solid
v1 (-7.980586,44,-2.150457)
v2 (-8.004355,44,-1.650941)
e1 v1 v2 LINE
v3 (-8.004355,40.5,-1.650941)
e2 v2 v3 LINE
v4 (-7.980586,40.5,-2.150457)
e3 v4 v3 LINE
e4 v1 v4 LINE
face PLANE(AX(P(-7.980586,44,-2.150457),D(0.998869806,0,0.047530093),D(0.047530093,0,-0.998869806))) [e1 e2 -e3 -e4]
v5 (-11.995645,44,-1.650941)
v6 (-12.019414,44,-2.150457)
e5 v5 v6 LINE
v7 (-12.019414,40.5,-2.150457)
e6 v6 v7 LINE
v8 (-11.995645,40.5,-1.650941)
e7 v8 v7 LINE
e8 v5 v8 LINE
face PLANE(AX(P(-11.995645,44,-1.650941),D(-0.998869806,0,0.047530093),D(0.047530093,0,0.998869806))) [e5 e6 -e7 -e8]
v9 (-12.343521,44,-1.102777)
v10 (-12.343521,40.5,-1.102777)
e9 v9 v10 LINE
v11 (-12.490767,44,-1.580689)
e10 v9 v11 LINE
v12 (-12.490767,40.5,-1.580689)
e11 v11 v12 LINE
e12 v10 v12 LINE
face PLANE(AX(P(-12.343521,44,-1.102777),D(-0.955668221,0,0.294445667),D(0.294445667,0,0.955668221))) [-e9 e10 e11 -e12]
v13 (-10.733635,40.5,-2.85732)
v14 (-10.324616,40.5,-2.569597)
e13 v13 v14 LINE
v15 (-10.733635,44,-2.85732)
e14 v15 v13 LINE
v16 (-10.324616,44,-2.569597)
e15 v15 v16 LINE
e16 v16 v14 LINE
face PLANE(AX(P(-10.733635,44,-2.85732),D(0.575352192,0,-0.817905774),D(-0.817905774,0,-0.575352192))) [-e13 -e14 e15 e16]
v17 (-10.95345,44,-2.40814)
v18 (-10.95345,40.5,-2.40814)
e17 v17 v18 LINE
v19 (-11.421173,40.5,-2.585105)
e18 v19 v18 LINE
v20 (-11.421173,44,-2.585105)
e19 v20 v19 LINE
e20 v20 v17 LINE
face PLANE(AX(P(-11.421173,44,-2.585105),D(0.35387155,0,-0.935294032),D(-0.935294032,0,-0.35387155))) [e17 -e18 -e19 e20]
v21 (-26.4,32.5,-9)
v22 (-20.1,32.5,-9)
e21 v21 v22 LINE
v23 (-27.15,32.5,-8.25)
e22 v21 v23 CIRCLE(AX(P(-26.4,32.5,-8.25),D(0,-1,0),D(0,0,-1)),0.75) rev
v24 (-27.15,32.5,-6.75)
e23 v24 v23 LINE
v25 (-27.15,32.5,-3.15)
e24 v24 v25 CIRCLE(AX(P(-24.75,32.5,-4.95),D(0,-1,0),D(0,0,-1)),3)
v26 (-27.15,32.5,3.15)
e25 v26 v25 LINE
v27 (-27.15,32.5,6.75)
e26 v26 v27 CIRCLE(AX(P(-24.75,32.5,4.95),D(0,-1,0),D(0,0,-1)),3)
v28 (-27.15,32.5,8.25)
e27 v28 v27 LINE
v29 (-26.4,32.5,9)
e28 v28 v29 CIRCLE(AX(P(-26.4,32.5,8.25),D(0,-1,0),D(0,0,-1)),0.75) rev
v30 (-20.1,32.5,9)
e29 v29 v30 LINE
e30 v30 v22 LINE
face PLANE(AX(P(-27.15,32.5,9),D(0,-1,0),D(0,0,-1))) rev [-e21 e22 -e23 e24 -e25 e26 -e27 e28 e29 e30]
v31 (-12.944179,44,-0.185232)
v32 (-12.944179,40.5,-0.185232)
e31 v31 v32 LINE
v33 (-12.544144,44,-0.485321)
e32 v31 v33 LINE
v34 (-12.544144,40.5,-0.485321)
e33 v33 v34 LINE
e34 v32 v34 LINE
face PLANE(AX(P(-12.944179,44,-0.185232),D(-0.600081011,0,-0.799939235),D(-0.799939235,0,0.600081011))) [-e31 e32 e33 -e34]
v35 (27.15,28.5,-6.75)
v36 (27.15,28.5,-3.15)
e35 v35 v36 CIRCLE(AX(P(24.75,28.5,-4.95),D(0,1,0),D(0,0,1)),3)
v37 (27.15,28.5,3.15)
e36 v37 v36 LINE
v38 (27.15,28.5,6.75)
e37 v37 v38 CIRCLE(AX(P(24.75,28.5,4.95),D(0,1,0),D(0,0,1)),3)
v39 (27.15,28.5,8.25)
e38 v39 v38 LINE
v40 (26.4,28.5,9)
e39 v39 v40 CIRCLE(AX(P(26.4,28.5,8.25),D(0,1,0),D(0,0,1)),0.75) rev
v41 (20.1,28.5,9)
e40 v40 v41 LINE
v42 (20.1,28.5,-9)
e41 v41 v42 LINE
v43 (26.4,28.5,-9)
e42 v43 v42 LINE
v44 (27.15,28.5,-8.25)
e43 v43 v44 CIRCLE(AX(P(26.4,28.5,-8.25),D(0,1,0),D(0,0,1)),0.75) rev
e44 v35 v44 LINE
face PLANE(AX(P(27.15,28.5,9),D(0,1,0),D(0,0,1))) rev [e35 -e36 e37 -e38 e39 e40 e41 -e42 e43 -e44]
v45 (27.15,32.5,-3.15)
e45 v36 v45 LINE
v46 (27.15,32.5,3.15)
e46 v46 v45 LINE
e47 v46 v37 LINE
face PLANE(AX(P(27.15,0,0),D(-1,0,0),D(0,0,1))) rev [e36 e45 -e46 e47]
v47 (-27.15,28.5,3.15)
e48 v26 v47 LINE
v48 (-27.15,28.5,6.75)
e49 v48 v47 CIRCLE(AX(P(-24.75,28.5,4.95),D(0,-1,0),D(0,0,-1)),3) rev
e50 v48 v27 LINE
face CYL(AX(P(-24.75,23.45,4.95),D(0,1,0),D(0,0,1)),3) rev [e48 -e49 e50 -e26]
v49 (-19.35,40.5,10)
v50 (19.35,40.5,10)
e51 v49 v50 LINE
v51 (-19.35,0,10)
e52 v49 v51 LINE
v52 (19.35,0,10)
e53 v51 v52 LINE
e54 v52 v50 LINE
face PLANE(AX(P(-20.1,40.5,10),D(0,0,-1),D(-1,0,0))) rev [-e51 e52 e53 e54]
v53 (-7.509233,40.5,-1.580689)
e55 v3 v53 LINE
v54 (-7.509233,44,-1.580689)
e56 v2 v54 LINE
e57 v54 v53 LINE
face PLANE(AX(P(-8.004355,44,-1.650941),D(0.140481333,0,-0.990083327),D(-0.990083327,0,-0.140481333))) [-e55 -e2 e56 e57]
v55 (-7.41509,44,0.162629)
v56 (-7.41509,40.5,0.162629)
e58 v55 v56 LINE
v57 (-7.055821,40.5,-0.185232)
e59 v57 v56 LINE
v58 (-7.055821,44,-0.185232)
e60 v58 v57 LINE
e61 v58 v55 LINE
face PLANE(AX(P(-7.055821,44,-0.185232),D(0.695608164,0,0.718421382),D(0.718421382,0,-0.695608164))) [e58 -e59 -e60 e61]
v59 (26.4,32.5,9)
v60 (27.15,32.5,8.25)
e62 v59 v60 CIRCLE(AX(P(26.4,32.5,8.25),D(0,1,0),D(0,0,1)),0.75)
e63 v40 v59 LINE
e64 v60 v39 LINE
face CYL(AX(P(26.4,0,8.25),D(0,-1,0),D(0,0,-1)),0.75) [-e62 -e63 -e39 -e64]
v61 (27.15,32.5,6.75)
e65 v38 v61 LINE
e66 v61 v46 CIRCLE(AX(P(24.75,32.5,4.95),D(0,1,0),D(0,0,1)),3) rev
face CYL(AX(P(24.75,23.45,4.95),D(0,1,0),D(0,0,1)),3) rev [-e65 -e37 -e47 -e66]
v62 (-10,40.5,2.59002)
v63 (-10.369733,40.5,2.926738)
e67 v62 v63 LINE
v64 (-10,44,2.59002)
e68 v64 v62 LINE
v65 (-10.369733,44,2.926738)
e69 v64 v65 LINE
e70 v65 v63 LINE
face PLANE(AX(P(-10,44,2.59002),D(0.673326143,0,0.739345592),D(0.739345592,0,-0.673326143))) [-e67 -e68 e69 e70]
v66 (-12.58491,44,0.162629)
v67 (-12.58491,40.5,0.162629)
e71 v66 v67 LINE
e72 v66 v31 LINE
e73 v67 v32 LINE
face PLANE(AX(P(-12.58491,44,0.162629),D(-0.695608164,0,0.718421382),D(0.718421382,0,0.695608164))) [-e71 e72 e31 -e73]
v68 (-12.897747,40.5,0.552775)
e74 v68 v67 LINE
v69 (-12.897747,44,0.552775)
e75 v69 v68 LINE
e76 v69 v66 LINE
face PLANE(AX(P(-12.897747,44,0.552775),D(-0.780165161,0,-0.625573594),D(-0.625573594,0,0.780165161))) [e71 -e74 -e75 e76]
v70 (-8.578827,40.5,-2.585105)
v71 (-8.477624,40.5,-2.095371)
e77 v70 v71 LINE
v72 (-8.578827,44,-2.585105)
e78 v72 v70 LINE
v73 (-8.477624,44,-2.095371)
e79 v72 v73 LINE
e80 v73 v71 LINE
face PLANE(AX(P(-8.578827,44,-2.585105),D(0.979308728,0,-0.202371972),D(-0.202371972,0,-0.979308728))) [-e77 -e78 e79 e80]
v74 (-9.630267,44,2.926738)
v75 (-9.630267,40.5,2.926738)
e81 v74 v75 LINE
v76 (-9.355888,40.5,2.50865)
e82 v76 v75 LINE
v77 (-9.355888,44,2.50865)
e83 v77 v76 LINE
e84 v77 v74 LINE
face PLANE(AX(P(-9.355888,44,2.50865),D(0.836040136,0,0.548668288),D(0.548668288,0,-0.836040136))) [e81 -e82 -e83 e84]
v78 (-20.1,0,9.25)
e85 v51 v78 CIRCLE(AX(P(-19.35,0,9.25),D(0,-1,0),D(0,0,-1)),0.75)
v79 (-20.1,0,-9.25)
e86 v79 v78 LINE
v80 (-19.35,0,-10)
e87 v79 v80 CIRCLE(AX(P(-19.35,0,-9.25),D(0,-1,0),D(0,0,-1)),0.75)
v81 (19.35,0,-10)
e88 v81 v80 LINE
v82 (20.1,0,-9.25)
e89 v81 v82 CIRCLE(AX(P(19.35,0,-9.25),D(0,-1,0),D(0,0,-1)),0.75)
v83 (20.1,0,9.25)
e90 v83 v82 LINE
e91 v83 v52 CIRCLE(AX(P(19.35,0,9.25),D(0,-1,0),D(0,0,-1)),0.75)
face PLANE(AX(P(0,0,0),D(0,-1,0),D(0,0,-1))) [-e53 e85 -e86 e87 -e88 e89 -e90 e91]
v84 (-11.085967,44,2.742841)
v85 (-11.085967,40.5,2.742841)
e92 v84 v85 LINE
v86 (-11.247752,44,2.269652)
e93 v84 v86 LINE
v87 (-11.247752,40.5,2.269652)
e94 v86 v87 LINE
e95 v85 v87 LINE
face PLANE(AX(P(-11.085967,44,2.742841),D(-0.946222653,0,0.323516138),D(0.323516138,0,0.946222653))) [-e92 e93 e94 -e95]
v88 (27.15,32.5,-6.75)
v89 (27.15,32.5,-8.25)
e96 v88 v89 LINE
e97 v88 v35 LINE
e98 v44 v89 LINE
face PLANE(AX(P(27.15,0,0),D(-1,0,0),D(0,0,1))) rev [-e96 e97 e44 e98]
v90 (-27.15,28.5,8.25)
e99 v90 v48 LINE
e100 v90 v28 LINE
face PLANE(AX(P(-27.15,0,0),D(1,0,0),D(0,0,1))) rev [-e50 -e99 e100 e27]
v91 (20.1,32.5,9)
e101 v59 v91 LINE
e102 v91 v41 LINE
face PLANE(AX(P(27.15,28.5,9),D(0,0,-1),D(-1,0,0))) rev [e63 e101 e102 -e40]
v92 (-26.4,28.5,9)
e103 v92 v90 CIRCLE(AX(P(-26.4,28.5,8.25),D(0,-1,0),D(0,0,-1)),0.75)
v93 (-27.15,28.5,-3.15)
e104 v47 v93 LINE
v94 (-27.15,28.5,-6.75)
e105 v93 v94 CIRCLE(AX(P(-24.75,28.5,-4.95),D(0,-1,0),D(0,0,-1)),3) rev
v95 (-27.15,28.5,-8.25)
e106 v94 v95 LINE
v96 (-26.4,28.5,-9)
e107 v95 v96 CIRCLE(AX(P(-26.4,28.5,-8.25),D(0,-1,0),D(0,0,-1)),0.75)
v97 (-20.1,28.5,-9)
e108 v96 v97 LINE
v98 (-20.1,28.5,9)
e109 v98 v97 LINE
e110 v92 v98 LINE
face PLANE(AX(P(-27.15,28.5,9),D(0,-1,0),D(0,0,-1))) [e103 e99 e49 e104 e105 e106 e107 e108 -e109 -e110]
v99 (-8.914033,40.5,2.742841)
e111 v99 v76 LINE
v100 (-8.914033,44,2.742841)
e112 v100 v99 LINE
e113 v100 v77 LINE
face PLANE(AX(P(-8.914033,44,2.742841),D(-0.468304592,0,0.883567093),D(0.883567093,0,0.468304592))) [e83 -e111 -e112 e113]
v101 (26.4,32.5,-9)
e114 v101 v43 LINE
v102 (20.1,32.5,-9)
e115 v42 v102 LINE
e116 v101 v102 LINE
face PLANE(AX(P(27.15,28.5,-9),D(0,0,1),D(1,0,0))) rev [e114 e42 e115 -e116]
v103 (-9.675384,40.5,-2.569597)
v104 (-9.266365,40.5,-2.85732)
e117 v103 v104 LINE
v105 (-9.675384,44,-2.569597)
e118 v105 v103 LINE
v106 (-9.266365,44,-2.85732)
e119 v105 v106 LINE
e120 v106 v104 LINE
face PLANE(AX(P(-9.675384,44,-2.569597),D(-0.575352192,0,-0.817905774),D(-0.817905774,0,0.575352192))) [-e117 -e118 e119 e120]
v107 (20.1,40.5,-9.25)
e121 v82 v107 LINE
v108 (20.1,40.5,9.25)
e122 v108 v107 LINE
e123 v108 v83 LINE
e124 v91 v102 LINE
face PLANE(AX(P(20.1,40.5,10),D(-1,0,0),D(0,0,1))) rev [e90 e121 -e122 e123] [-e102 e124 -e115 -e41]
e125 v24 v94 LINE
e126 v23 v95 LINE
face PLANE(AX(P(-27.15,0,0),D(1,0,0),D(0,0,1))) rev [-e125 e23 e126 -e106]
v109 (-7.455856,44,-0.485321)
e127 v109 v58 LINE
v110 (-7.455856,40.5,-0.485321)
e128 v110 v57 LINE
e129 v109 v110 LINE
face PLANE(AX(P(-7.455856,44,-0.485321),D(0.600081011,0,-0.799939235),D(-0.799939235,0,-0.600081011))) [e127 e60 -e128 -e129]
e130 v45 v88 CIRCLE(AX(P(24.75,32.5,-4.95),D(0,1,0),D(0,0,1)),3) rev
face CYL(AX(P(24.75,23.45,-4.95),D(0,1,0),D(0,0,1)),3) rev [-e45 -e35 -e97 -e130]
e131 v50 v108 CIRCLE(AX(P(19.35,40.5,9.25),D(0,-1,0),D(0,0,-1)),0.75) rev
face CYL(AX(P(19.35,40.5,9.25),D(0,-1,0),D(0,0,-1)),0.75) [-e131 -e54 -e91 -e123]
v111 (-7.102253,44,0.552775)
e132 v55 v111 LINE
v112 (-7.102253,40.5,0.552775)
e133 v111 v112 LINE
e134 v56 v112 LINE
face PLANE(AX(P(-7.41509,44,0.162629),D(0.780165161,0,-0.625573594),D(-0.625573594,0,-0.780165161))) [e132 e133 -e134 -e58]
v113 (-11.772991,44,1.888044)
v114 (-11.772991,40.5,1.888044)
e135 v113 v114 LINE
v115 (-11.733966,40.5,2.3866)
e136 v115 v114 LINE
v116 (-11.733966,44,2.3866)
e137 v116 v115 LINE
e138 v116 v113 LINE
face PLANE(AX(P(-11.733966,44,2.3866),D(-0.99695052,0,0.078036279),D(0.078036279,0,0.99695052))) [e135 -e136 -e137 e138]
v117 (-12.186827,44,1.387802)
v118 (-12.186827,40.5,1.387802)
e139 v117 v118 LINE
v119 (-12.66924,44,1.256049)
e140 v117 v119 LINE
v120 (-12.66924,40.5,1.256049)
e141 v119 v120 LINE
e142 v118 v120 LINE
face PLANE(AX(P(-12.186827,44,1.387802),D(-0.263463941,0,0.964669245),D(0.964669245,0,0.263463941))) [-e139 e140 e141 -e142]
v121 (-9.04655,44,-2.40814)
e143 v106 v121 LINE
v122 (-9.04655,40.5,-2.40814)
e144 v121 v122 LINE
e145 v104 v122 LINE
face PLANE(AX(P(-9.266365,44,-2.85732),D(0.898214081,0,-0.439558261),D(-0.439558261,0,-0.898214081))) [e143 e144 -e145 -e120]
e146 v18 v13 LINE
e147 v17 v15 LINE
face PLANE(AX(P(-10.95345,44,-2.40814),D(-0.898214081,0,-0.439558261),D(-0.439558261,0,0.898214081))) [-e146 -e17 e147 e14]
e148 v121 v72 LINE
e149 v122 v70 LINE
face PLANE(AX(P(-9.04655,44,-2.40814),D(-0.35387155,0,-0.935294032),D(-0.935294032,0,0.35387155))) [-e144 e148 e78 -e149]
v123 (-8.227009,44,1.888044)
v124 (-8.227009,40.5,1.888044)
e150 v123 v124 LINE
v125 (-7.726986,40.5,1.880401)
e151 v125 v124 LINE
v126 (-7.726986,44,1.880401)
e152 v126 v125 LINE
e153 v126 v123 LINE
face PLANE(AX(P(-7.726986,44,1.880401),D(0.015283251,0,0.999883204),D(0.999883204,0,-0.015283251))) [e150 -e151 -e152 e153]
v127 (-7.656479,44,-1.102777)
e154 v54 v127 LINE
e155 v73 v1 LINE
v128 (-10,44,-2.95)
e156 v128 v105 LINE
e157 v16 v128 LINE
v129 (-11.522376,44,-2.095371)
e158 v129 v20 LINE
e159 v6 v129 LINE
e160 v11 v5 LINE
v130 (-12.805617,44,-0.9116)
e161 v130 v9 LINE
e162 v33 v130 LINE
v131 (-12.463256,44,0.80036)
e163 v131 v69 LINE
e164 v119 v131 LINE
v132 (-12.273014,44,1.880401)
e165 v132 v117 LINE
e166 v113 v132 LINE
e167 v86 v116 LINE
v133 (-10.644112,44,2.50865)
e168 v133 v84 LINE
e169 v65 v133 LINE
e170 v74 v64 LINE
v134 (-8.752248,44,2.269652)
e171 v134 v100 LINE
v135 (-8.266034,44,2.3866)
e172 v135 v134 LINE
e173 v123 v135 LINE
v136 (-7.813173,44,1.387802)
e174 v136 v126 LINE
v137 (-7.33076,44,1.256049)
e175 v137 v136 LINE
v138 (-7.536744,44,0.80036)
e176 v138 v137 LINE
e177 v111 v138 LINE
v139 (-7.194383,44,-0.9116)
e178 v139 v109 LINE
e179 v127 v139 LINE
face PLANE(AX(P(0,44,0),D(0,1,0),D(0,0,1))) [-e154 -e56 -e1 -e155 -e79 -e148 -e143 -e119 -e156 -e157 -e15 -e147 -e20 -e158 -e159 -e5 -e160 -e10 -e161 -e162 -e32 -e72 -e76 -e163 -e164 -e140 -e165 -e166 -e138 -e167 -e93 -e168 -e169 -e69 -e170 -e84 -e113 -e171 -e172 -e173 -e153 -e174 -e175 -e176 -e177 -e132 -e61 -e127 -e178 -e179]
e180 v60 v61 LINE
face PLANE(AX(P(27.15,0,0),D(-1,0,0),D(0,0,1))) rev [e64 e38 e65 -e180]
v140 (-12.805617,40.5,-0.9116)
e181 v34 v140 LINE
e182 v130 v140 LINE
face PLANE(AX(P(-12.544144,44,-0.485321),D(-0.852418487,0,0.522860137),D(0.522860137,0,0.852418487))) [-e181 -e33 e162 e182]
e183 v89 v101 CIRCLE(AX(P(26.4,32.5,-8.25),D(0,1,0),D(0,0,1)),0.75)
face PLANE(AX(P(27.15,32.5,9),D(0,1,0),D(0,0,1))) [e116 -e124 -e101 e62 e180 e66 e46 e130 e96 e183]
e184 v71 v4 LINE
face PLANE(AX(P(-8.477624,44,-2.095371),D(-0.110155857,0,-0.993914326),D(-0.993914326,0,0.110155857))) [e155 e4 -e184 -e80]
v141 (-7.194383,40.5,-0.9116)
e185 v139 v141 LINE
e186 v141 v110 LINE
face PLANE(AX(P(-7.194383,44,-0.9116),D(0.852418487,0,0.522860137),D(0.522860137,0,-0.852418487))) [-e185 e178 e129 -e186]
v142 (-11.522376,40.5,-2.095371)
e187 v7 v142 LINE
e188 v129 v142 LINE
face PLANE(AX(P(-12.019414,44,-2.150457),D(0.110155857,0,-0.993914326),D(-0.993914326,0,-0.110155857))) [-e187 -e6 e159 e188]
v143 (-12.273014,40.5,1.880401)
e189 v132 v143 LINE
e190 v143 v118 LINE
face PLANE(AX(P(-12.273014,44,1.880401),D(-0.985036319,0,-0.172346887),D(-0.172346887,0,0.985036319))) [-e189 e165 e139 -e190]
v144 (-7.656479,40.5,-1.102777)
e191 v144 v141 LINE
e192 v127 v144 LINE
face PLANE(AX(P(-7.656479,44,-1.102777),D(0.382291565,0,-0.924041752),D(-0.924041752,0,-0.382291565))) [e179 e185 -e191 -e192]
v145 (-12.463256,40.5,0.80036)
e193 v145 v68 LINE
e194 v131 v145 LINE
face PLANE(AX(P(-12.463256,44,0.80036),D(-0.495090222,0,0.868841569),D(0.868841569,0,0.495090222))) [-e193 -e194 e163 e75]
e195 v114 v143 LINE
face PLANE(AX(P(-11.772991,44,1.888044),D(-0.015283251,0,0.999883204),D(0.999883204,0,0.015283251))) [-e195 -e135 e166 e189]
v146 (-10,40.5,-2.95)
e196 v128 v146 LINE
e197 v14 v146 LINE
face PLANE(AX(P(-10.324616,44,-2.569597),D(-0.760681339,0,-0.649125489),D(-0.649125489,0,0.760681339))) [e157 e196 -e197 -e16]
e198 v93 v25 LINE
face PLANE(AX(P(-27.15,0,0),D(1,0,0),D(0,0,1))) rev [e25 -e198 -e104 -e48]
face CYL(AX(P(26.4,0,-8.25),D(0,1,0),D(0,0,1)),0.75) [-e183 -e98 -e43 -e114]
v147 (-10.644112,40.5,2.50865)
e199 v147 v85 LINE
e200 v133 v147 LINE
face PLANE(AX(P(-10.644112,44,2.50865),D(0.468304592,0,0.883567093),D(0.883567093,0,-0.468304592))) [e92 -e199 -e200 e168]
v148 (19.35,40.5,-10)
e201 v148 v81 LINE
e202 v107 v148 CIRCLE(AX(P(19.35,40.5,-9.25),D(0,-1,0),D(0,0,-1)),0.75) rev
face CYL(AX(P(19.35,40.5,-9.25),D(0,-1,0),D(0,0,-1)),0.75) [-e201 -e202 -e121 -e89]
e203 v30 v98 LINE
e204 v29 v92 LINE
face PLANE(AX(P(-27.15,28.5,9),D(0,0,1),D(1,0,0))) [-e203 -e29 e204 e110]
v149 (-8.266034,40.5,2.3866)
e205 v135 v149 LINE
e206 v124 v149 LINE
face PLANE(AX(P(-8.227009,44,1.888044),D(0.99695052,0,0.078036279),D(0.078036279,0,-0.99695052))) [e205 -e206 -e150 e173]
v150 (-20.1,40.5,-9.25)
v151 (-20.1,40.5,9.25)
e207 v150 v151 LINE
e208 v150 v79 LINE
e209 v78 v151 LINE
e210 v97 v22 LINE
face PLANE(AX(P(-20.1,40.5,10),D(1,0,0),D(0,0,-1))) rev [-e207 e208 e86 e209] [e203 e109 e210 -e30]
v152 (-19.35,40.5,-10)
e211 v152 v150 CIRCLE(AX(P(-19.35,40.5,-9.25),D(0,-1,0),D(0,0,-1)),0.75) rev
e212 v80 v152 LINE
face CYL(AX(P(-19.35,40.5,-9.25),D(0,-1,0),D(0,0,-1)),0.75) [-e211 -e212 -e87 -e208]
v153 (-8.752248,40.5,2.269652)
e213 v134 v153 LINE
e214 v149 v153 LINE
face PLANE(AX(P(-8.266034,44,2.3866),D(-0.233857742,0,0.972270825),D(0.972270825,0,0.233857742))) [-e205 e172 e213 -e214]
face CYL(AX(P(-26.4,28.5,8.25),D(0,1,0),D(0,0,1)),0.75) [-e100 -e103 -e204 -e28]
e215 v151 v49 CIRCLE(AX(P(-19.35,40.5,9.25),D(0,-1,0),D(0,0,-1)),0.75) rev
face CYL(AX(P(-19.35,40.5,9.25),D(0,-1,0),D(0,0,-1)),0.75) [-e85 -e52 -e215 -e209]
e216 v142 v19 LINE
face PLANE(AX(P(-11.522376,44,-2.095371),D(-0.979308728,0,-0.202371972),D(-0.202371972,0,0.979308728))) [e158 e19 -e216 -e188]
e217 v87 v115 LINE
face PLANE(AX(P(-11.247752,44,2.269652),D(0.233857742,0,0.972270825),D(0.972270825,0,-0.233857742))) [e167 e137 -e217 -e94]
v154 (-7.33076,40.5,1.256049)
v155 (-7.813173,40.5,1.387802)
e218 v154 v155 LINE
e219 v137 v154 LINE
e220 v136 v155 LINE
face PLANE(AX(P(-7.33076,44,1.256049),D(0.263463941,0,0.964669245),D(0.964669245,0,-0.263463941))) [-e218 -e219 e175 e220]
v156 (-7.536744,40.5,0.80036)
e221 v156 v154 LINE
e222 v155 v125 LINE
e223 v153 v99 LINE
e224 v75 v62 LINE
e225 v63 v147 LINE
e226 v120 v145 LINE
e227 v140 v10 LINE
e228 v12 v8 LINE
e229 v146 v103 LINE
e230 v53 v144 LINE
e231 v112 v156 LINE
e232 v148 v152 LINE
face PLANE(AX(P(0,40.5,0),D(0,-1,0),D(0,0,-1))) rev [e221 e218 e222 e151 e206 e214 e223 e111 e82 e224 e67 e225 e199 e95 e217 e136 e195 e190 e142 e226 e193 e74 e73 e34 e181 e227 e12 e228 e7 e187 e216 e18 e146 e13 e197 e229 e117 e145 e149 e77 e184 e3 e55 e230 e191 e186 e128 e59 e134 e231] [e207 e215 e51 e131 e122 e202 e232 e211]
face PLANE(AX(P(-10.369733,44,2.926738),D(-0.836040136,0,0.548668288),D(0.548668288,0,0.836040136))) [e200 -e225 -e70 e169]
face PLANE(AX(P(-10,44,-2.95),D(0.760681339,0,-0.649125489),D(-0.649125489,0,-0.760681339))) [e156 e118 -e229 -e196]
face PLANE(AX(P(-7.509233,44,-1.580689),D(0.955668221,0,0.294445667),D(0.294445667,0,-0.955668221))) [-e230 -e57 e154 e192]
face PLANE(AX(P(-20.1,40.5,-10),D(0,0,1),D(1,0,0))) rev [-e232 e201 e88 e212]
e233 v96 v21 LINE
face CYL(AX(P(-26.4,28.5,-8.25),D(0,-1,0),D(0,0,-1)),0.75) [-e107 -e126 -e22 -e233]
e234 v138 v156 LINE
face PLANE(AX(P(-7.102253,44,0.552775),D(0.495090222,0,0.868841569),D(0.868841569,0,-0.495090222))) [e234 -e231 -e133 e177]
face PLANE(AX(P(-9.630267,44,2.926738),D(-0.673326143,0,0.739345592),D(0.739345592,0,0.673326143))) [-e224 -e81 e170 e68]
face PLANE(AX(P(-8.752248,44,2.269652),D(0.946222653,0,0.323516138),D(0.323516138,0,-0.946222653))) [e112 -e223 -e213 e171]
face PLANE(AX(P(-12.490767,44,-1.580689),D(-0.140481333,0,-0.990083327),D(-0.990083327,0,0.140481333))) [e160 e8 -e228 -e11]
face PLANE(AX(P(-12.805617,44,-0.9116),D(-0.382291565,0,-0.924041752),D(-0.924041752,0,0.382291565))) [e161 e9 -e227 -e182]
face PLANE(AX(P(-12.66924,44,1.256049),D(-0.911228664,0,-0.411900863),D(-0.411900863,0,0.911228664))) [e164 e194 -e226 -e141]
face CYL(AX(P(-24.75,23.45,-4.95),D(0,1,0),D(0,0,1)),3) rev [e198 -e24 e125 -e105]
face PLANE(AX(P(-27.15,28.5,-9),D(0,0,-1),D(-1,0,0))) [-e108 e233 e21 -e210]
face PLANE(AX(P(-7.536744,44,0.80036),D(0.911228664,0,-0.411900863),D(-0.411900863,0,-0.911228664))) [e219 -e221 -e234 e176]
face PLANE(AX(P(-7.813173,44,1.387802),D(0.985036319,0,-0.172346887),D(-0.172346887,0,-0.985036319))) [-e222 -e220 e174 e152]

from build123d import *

# Parameters (mm, degrees)
SKETCH1_W           = 40.2
SKETCH1_H           = 20
BOSS_EXTRUDE1_DEPTH = 40.5
SKETCH2_W           = 18
SKETCH2_H           = 2
BOSS_EXTRUDE2_DEPTH = 7.05
SKETCH5_R           = 3
CUT_EXTRUDE1_DEPTH  = 7.05
MIRROR2_START       = 28.5
MIRROR2_DEPTH       = 4
FILLET2_R           = 0.75
BOSS_EXTRUDE3_DEPTH = 3.5


# Read off the part's stored shape, not the designer's step: Mirror2
with BuildPart() as part:
    # Sketch1 → Boss-Extrude1 (new body)
    with BuildSketch(Plane(origin=(0, 0, 0), x_dir=(1, 0, 0), z_dir=(0, 1, 0))):
        Rectangle(SKETCH1_W, SKETCH1_H)
    extrude(amount=BOSS_EXTRUDE1_DEPTH)

    # Sketch2 → Boss-Extrude2 (add)
    with BuildSketch(Plane(origin=(20.1, 0, 0), x_dir=(0, 0, -1), z_dir=(1, 0, 0))):
        with Locations((0, 29.5)):
            Rectangle(SKETCH2_W, SKETCH2_H)
    extrude(amount=BOSS_EXTRUDE2_DEPTH)

    # Sketch5 → Cut-Extrude1 (cut)
    with BuildSketch(Plane(origin=(0, 30.5, 0), x_dir=(1, 0, 0), z_dir=(0, 1, 0))):
        with Locations((24.75, 4.95)):
            Circle(SKETCH5_R)
        with Locations((24.75, -4.95)):
            Circle(SKETCH5_R)
    extrude(amount=-CUT_EXTRUDE1_DEPTH, mode=Mode.SUBTRACT)

    # Mirror2 outline → Mirror2 (add)
    with BuildSketch(Plane(origin=(0, 0, 0), x_dir=(1, 0, 0), z_dir=(0, 1, 0)).offset(MIRROR2_START)):
        with BuildLine():
            Line((-27.15, 3.15), (-27.15, -3.15))
            ThreePointArc((-27.15, -3.15), (-21.75, -4.95), (-27.15, -6.75))
            Line((-27.15, -6.75), (-27.15, -9))
            Line((-27.15, -9), (-20.1, -9))
            Line((-20.1, -9), (-20.1, 9))
            Line((-20.1, 9), (-27.15, 9))
            Line((-27.15, 9), (-27.15, 6.75))
            ThreePointArc((-27.15, 6.75), (-21.75, 4.95), (-27.15, 3.15))
        make_face()
        with BuildLine():
            Line((27.15, 6.75), (27.15, 9))
            Line((27.15, 9), (20.1, 9))
            Line((20.1, 9), (20.1, -9))
            Line((20.1, -9), (27.15, -9))
            Line((27.15, -9), (27.15, -6.75))
            ThreePointArc((27.15, -6.75), (21.75, -4.95), (27.15, -3.15))
            Line((27.15, -3.15), (27.15, 3.15))
            ThreePointArc((27.15, 3.15), (21.75, 4.95), (27.15, 6.75))
        make_face()
    extrude(amount=MIRROR2_DEPTH)

    # Fillet2
    fillet2_edges = [part.edges().sort_by_distance(p)[0] for p in [
        (27.15, 30.5, 9),
        (27.15, 30.5, -9),
        (-27.15, 30.5, 9),
        (-27.15, 30.5, -9),
        (20.1, 20.25, 10),
        (-20.1, 20.25, 10),
        (-20.1, 20.25, -10),
        (20.1, 20.25, -10),
    ]]
    fillet(fillet2_edges, radius=FILLET2_R)

    # Sketch6 → Boss-Extrude3 (add)
    with BuildSketch(Plane(origin=(0, 40.5, 0), x_dir=(1, 0, 0), z_dir=(0, 1, 0))):
        Polygon((-9.266364833, 2.857320325), (-9.046549886, 2.408140097), (-8.578826661, 2.585104706), (-8.477624186, 2.095370547), (-7.980586038, 2.150457451), (-8.004354957, 1.650941158), (-7.50923262, 1.580689045), (-7.656479445, 1.102777065), (-7.194383277, 0.911600133), (-7.455855949, 0.485321434), (-7.055821151, 0.185232033), (-7.41509038, -0.162628729), (-7.10225261, -0.552774878), (-7.536744189, -0.80036033), (-7.330760195, -1.25604891), (-7.81317342, -1.387802348), (-7.726985934, -1.88040077), (-8.227009008, -1.888043641), (-8.266033506, -2.386600133), (-8.75224814, -2.269652207), (-8.91403257, -2.742840633), (-9.355888111, -2.508650179), (-9.630266961, -2.926738369), (-10, -2.590020434), (-10.369733039, -2.926738369), (-10.644111889, -2.508650179), (-11.08596743, -2.742840633), (-11.24775186, -2.269652207), (-11.733966494, -2.386600133), (-11.772990992, -1.888043641), (-12.273014066, -1.88040077), (-12.18682658, -1.387802348), (-12.669239805, -1.25604891), (-12.463255811, -0.80036033), (-12.89774739, -0.552774878), (-12.58490962, -0.162628729), (-12.944178849, 0.185232033), (-12.544144051, 0.485321434), (-12.805616723, 0.911600133), (-12.343520555, 1.102777065), (-12.49076738, 1.580689045), (-11.995645043, 1.650941158), (-12.019413962, 2.150457451), (-11.522375814, 2.095370547), (-11.421173339, 2.585104706), (-10.953450114, 2.408140097), (-10.733635167, 2.857320325), (-10.324615636, 2.569597349), (-10, 2.95), (-9.675384364, 2.569597349), align=None)
    extrude(amount=BOSS_EXTRUDE3_DEPTH)


solid = part.part
